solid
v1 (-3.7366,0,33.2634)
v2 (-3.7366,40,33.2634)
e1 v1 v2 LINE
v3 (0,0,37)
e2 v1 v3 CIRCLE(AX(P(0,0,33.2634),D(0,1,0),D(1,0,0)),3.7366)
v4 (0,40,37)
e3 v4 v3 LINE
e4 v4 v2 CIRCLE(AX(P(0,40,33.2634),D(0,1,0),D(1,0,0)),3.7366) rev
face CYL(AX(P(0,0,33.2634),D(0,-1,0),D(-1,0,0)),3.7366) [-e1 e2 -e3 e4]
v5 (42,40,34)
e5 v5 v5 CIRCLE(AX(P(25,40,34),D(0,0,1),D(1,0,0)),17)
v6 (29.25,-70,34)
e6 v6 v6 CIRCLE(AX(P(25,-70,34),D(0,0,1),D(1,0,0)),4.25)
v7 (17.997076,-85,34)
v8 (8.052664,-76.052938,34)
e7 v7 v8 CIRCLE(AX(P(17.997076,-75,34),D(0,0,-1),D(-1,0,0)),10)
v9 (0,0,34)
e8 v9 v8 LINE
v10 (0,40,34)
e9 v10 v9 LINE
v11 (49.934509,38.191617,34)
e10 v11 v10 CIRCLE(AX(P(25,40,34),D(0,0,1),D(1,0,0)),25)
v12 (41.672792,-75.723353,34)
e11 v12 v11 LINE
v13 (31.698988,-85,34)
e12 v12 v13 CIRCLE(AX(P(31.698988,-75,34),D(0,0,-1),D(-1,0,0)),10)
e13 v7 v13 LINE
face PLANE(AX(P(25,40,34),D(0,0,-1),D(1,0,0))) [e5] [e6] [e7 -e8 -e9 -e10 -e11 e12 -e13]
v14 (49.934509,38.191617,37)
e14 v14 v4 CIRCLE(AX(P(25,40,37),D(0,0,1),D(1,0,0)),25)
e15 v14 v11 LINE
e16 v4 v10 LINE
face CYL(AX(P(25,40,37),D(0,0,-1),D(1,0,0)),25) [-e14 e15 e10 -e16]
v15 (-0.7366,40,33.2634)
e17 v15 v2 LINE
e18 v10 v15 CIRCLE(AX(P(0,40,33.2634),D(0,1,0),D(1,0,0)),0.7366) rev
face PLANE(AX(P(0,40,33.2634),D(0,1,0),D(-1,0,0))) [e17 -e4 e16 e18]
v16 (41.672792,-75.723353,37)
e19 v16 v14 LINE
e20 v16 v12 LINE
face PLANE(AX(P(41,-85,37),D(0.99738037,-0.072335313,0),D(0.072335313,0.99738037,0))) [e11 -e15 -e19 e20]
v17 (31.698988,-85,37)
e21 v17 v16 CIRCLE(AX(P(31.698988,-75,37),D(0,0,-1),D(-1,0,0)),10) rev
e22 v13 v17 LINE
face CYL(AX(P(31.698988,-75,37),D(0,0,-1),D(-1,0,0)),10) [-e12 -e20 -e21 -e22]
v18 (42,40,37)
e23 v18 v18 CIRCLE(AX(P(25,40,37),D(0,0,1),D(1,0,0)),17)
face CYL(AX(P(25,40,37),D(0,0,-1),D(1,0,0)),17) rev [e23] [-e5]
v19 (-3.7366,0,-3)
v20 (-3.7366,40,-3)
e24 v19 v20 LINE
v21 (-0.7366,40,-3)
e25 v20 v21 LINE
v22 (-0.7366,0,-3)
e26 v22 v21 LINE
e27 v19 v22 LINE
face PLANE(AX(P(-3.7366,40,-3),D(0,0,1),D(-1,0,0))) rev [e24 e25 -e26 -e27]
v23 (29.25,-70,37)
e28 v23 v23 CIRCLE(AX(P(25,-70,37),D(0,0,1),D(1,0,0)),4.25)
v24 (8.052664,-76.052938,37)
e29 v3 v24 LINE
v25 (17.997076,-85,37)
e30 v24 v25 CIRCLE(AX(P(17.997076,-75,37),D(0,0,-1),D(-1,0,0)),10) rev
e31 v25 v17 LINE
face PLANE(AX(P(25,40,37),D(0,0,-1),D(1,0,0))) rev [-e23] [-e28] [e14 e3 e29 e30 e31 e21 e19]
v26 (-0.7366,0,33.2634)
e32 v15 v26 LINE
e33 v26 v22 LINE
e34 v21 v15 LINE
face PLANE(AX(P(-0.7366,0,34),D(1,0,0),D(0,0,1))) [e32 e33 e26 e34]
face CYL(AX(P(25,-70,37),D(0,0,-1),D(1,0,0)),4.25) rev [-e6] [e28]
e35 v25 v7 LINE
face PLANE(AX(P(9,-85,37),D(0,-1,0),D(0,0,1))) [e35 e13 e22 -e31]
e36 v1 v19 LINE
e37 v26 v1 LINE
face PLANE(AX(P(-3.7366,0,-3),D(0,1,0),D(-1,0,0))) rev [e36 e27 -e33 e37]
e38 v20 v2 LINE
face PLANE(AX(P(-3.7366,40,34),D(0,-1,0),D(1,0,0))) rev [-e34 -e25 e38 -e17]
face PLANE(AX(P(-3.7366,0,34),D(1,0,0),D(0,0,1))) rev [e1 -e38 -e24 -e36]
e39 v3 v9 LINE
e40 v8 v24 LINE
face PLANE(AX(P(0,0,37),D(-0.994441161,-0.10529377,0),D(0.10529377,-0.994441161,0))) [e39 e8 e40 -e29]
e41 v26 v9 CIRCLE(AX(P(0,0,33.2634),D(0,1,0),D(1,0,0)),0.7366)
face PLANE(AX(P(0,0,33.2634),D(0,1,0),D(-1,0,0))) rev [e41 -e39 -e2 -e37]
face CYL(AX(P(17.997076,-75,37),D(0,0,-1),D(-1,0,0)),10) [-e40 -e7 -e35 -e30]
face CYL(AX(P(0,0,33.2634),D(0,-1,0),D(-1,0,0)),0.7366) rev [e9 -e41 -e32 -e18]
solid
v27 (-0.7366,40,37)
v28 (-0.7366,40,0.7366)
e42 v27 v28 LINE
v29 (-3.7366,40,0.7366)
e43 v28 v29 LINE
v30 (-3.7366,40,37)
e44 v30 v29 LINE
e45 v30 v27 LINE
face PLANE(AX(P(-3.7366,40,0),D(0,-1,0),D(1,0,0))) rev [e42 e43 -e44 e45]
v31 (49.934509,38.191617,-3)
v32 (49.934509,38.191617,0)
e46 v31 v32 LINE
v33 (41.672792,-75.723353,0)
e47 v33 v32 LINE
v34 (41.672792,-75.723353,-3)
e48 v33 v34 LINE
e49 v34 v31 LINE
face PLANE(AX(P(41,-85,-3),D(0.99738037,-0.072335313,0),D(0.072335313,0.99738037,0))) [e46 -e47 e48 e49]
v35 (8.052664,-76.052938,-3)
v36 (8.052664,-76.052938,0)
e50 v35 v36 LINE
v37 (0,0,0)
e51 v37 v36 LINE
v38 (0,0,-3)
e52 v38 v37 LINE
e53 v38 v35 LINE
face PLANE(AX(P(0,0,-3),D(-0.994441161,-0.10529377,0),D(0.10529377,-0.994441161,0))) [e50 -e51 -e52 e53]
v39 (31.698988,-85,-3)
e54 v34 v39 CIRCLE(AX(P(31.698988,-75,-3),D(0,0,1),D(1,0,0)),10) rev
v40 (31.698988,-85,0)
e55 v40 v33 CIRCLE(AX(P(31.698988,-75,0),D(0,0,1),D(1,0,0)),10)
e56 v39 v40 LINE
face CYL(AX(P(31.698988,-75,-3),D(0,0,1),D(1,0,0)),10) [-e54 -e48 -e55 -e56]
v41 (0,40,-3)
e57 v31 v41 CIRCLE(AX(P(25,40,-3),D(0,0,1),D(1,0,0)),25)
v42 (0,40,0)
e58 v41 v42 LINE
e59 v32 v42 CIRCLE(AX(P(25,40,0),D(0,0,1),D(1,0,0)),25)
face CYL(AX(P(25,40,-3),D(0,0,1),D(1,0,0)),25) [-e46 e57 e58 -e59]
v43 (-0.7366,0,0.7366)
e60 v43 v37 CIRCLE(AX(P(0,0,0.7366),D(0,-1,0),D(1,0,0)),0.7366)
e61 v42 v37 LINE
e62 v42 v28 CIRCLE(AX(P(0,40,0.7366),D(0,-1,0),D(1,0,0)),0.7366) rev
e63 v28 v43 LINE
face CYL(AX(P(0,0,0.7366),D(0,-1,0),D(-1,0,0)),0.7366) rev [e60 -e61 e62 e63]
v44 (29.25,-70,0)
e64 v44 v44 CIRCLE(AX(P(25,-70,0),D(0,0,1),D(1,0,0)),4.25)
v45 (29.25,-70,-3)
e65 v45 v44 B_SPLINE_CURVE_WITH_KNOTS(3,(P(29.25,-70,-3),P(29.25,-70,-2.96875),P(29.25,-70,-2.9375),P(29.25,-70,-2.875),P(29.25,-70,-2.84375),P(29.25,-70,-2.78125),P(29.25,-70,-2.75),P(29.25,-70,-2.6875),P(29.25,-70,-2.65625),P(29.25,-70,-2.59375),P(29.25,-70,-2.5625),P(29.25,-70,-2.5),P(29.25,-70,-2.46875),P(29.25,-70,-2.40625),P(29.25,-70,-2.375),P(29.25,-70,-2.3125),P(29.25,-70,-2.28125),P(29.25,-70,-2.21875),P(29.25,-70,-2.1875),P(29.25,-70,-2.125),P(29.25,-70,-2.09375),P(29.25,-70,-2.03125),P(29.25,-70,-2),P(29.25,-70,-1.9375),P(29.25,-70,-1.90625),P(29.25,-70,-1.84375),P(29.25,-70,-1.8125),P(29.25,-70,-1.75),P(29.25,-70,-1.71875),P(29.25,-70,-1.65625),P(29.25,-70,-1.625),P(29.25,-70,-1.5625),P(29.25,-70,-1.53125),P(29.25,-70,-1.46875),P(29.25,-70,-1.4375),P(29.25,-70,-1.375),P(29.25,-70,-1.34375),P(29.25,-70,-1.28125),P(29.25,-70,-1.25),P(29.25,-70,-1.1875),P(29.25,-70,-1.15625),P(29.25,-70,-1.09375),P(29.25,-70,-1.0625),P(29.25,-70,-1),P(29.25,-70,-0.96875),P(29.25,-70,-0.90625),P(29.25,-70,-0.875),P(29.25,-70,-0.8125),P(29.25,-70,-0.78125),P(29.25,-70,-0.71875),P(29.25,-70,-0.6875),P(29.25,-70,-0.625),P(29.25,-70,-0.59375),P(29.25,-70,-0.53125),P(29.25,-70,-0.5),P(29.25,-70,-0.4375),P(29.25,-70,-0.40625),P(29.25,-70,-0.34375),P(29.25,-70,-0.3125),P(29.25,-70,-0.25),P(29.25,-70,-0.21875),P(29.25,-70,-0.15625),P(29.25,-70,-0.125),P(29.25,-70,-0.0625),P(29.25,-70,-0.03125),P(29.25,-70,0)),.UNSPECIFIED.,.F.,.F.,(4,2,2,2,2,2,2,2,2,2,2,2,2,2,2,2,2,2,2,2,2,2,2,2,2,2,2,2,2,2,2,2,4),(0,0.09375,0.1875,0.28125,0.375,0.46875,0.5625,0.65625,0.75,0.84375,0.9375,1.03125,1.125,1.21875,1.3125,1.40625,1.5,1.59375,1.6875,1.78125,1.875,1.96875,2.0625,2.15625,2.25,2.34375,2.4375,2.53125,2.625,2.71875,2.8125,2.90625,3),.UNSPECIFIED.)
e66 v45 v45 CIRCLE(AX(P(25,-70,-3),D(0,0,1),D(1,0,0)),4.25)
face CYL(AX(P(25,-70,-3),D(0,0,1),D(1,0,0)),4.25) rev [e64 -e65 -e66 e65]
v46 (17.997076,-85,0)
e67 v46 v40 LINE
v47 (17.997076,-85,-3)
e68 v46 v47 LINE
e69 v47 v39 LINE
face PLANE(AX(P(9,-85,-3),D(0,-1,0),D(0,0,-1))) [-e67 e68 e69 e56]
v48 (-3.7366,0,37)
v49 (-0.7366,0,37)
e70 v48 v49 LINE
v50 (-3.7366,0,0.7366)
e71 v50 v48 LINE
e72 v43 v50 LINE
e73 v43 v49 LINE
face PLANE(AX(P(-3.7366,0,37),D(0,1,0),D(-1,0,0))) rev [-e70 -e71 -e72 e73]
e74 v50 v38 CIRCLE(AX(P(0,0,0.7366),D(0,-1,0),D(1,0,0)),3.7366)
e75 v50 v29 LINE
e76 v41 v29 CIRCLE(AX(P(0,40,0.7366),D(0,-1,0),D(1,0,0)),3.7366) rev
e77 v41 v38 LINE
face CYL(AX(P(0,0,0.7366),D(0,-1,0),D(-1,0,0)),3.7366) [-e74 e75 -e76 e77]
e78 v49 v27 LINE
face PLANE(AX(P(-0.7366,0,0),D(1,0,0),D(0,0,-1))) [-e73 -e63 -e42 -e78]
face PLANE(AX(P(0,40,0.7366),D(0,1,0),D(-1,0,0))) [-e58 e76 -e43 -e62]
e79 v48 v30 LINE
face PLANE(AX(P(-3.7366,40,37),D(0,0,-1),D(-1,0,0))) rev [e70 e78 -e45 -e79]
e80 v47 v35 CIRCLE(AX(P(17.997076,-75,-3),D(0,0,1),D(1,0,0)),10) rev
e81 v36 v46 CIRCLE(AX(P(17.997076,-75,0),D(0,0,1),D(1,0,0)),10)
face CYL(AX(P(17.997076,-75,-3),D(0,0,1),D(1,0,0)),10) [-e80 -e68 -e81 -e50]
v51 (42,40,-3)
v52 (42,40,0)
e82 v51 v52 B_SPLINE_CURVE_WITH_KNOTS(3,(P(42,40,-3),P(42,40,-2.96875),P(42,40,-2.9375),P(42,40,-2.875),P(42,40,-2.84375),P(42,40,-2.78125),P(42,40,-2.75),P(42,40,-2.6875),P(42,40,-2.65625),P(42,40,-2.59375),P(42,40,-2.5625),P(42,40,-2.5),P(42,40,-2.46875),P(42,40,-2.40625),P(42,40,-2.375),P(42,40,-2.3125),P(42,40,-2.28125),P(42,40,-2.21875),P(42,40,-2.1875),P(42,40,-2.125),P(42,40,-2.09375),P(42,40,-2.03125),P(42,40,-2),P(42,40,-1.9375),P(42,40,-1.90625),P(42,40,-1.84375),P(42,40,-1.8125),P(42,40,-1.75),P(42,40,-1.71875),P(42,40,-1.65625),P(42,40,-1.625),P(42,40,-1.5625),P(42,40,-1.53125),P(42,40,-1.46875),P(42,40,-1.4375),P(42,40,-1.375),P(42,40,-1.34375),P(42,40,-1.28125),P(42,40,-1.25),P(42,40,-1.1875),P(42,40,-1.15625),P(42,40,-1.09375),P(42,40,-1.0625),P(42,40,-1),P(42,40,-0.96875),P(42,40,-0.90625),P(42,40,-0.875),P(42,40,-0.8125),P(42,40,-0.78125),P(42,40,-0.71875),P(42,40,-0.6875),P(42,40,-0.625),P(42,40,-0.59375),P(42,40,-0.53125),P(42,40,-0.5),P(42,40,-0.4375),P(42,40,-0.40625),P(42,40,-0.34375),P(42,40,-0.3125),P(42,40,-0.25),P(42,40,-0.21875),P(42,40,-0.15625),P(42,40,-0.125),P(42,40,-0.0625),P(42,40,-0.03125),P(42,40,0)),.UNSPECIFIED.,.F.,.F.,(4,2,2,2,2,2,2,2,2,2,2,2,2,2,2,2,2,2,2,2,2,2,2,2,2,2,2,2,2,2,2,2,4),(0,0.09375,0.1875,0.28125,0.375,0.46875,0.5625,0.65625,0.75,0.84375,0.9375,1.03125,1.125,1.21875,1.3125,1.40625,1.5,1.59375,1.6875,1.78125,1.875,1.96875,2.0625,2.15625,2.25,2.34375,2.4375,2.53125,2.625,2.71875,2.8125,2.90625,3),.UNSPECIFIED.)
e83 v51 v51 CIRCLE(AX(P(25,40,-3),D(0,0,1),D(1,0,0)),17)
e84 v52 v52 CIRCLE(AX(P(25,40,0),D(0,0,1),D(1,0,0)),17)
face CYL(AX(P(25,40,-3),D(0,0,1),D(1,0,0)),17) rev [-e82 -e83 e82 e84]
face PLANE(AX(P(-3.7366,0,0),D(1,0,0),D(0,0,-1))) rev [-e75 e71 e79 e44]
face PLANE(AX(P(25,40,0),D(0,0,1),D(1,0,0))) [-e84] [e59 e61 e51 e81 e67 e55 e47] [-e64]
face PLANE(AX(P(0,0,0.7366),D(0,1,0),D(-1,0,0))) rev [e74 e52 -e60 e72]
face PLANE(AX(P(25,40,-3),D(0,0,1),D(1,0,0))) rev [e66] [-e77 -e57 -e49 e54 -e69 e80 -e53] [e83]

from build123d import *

# Parameters (mm, degrees)
SKETCH1_R          = 17
SKETCH1_R_2        = 4.25
BASE_FLANGE1_DEPTH = 3
EDGE_FLANGE1_DEPTH = 40
FILLET1_R          = 10
FILLET2_R          = 10


# Sheet-metal steps are written as plain solids
with BuildPart() as part:
    # Sketch1 → Base-Flange1 (new body)
    with BuildSketch(Plane.XY):
        with BuildLine():
            Line((0, 40), (0, 0))
            Line((0, 0), (9, -85))
            Line((9, -85), (41, -85))
            Line((41, -85), (49.934509251, 38.191617184))
            ThreePointArc((49.934509251, 38.191617184), (25.904784152, 64.983621948), (0, 40))
        make_face()
        with Locations((25, 40)):
            Circle(SKETCH1_R, mode=Mode.SUBTRACT)
        with Locations((25, -70)):
            Circle(SKETCH1_R_2, mode=Mode.SUBTRACT)
    extrude(amount=-BASE_FLANGE1_DEPTH)

    # Edge-Flange1 section (across the edge) → Edge-Flange1 (add)
    with BuildSketch(Plane(origin=(-0.7366, 40, 0), x_dir=(1, 0, 0), z_dir=(0, -1, 0))):
        with BuildLine():
            Line((-3, 0.7366), (-3, 37))
            Line((-3, 37), (0, 37))
            Line((0, 37), (0, 0.7366))
            ThreePointArc((0, 0.7366), (0.215745145, 0.215745145), (0.7366, 0))
            Line((0.7366, 0), (0.7366, -3))
            ThreePointArc((0.7366, -3), (-1.905575199, -1.905575199), (-3, 0.7366))
        make_face()
    extrude(amount=EDGE_FLANGE1_DEPTH)


with BuildPart() as body_2:
    # Mirror1: mirrored copy
    add(part.part.mirror(Plane(origin=(0, 0, 17), x_dir=(1, 0, 0), z_dir=(0, 0, -1))))

    # Fillet1
    fillet1_edges = [body_2.edges().sort_by_distance(p)[0] for p in [
        (41, -85, 35.5),
        (9, -85, 35.5),
    ]]
    fillet(fillet1_edges, radius=FILLET1_R)


with BuildPart() as part_1:
    add(part.part)

    # Fillet2
    fillet2_edges = [part_1.edges().sort_by_distance(p)[0] for p in [
        (41, -85, -1.5),
        (9, -85, -1.5),
    ]]
    fillet(fillet2_edges, radius=FILLET2_R)


solid = Compound([body_2.part, part_1.part])
